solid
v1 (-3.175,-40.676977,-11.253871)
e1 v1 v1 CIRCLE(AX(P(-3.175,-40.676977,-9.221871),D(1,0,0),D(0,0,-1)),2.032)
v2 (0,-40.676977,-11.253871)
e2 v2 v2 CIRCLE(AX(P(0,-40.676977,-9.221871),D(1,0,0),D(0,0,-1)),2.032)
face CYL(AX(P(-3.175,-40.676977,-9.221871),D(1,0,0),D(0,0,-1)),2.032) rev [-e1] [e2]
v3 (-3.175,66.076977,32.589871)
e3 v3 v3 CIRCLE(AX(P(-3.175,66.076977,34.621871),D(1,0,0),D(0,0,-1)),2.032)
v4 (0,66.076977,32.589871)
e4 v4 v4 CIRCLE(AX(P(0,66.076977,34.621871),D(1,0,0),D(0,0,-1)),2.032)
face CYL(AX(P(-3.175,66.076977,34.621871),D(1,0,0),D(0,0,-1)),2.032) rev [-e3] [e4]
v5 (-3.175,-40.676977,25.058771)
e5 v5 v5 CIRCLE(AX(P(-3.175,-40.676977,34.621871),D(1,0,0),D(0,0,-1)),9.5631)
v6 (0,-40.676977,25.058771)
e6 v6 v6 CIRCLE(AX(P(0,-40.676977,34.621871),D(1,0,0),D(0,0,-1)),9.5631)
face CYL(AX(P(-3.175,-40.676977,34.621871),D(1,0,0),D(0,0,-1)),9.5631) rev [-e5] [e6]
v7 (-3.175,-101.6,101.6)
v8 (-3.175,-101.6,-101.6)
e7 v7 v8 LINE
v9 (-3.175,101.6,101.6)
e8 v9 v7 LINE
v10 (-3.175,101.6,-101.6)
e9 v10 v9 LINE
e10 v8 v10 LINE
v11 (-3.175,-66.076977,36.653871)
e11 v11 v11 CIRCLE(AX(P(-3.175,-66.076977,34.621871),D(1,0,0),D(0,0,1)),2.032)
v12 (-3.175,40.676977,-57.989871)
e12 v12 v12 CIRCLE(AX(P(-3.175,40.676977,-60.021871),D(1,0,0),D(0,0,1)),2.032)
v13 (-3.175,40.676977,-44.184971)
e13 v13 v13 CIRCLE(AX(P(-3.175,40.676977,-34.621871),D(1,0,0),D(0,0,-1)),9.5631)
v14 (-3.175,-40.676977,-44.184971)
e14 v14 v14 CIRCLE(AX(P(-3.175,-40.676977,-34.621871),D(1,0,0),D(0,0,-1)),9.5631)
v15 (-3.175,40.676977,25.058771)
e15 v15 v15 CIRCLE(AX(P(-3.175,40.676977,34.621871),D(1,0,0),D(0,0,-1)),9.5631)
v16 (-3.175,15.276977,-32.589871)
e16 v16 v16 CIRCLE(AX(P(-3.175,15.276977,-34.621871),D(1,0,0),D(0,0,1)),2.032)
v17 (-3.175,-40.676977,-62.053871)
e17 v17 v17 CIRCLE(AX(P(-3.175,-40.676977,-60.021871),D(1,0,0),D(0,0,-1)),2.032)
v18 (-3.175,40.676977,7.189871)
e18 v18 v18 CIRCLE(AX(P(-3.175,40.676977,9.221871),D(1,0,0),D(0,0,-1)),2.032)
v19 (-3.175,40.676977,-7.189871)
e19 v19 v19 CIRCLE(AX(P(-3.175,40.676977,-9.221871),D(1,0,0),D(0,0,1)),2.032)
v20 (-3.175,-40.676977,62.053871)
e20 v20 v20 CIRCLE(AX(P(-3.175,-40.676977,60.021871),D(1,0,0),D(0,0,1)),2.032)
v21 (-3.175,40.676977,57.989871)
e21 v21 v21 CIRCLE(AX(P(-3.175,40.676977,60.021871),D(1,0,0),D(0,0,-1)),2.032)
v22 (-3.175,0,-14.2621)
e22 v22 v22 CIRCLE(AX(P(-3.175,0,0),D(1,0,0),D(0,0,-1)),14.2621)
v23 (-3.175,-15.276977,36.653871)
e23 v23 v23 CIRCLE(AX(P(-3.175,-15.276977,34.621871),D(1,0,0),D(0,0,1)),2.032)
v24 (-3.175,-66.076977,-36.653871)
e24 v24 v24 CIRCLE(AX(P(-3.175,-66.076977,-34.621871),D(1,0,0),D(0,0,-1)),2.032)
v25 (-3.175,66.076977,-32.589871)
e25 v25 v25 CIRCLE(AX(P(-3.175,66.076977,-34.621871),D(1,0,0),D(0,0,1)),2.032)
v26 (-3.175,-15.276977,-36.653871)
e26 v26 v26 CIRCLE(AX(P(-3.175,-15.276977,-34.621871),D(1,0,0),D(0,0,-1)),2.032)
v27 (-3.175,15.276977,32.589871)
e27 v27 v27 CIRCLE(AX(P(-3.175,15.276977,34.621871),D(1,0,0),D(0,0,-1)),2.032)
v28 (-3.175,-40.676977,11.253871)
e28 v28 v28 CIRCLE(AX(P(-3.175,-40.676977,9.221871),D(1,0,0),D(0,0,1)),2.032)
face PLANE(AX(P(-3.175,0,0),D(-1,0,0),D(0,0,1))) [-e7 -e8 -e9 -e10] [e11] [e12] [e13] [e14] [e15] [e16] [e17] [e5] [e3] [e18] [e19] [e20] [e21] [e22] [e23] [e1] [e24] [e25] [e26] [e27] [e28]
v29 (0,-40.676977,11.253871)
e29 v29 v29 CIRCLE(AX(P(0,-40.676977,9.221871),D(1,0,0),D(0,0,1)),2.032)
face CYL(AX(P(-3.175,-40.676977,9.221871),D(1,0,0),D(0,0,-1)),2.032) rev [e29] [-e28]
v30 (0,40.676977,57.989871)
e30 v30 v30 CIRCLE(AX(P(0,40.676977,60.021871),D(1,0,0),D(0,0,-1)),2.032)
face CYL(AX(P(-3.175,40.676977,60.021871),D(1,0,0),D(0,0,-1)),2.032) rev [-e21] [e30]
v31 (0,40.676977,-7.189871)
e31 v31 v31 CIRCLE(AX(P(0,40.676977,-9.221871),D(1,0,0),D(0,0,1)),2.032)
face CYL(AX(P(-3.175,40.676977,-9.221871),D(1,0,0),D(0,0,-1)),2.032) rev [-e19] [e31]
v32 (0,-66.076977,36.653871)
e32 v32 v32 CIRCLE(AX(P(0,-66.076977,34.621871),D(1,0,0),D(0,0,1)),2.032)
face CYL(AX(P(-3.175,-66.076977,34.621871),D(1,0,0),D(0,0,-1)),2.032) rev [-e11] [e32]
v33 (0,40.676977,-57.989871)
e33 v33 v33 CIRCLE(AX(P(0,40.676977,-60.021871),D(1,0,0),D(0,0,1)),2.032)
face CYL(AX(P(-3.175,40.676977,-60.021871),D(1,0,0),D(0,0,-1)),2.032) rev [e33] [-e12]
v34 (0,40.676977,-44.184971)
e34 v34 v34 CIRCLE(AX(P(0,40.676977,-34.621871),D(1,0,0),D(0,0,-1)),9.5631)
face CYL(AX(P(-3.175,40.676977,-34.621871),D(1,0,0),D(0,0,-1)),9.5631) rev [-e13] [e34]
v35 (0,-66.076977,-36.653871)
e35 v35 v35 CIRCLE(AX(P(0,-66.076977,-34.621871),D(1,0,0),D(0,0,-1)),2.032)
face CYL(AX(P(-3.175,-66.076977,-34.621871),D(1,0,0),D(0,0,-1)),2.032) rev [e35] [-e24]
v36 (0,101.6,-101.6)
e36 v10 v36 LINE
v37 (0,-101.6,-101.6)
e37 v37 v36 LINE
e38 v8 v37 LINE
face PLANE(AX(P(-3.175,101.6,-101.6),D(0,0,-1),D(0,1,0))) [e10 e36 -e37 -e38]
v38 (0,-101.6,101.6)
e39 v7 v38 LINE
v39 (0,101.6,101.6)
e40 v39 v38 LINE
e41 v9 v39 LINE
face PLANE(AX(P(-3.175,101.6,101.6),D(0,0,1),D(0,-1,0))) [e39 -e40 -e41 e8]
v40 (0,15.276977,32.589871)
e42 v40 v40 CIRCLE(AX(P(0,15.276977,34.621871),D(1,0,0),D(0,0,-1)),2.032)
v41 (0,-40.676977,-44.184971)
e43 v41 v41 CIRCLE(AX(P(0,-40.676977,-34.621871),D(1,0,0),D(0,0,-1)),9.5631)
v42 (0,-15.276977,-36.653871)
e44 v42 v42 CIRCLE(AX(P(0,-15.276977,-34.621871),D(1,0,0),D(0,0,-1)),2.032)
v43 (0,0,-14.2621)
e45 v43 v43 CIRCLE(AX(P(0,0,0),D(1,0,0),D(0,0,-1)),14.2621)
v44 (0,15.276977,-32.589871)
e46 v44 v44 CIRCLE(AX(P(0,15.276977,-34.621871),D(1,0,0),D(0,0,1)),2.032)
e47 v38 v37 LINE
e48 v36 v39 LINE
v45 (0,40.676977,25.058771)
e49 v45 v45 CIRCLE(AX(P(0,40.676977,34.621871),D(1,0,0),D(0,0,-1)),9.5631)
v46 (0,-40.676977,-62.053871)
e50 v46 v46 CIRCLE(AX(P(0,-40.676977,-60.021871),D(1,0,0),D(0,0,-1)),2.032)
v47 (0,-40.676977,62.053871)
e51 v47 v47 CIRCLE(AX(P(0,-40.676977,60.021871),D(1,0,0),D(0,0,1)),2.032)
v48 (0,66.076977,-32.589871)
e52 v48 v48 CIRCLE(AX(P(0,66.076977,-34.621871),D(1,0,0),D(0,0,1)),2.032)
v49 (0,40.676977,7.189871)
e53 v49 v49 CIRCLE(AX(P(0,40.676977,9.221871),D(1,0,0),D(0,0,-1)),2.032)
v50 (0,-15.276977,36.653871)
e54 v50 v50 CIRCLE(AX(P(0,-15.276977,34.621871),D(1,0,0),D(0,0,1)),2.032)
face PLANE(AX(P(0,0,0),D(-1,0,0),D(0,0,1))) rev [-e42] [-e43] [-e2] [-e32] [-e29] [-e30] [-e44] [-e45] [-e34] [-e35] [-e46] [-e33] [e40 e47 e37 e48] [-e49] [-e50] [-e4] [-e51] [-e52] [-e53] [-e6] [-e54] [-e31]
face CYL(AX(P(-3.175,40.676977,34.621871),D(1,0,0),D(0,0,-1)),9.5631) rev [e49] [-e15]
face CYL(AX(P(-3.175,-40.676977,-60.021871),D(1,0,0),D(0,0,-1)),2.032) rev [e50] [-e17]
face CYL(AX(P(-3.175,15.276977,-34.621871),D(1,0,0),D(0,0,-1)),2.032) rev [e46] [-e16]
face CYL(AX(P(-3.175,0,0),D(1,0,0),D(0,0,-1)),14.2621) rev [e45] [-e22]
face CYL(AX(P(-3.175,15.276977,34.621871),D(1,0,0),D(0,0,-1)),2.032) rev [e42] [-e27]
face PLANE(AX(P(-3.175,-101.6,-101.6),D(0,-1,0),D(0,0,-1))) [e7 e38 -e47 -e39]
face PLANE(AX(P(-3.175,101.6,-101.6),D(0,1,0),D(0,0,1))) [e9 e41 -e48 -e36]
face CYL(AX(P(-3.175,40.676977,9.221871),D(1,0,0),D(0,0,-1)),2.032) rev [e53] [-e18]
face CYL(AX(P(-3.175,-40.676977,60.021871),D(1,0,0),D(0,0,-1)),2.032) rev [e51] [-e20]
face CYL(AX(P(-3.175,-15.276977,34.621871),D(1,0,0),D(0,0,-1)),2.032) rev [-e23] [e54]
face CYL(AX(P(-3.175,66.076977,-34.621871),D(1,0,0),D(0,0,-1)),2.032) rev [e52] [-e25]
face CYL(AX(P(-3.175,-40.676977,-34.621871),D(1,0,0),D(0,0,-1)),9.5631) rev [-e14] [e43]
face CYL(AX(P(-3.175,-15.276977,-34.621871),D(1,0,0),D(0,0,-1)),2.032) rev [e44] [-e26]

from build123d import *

# Parameters (mm, degrees)
SKETCH1_W          = 203.2
SKETCH1_H          = 203.2
BASE_FLANGE1_DEPTH = 3.175
SKETCH6_R          = 9.5631
SKETCH6_R_2        = 14.2621
SKETCH6_R_3        = 2.032
CUT_EXTRUDE1_DEPTH = 3.175


# Sheet-metal steps are written as plain solids
with BuildPart() as part:
    # Sketch1 → Base-Flange1 (new body)
    with BuildSketch(Plane(origin=(0, 0, 0), x_dir=(0, 0, -1), z_dir=(1, 0, 0))):
        Rectangle(SKETCH1_W, SKETCH1_H)
    extrude(amount=-BASE_FLANGE1_DEPTH)

    # Sketch6 → Cut-Extrude1 (cut)
    with BuildSketch(Plane(origin=(0, 0, 0), x_dir=(0, 0, -1), z_dir=(1, 0, 0))):
        with Locations((-34.6218707, 40.676977416)):
            Circle(SKETCH6_R)
        with Locations((34.6218707, 40.676977416)):
            Circle(SKETCH6_R)
        with Locations((-34.6218707, -40.676977416)):
            Circle(SKETCH6_R)
        with Locations((34.6218707, -40.676977416)):
            Circle(SKETCH6_R)
        Circle(SKETCH6_R_2)
        with Locations((-34.6218707, 66.076977416)):
            Circle(SKETCH6_R_3)
        with Locations((-34.6218707, 15.276977416)):
            Circle(SKETCH6_R_3)
        with Locations((-60.0218707, 40.676977416)):
            Circle(SKETCH6_R_3)
        with Locations((-9.2218707, 40.676977416)):
            Circle(SKETCH6_R_3)
        with Locations(Location((34.6218707, 15.276977416, 0), (0, 0, 180))):
            Circle(SKETCH6_R_3)
        with Locations(Location((60.0218707, 40.676977416, 0), (0, 0, 180))):
            Circle(SKETCH6_R_3)
        with Locations(Location((9.2218707, 40.676977416, 0), (0, 0, 180))):
            Circle(SKETCH6_R_3)
        with Locations(Location((34.6218707, 66.076977416, 0), (0, 0, 180))):
            Circle(SKETCH6_R_3)
        with Locations((34.6218707, -15.276977416)):
            Circle(SKETCH6_R_3)
        with Locations((60.0218707, -40.676977416)):
            Circle(SKETCH6_R_3)
        with Locations((34.6218707, -66.076977416)):
            Circle(SKETCH6_R_3)
        with Locations((9.2218707, -40.676977416)):
            Circle(SKETCH6_R_3)
        with Locations(Location((-9.2218707, -40.676977416, 0), (0, 0, 180))):
            Circle(SKETCH6_R_3)
        with Locations(Location((-34.6218707, -15.276977416, 0), (0, 0, 180))):
            Circle(SKETCH6_R_3)
        with Locations(Location((-60.0218707, -40.676977416, 0), (0, 0, 180))):
            Circle(SKETCH6_R_3)
        with Locations(Location((-34.6218707, -66.076977416, 0), (0, 0, 180))):
            Circle(SKETCH6_R_3)
    extrude(amount=-CUT_EXTRUDE1_DEPTH, mode=Mode.SUBTRACT)


solid = part.part
